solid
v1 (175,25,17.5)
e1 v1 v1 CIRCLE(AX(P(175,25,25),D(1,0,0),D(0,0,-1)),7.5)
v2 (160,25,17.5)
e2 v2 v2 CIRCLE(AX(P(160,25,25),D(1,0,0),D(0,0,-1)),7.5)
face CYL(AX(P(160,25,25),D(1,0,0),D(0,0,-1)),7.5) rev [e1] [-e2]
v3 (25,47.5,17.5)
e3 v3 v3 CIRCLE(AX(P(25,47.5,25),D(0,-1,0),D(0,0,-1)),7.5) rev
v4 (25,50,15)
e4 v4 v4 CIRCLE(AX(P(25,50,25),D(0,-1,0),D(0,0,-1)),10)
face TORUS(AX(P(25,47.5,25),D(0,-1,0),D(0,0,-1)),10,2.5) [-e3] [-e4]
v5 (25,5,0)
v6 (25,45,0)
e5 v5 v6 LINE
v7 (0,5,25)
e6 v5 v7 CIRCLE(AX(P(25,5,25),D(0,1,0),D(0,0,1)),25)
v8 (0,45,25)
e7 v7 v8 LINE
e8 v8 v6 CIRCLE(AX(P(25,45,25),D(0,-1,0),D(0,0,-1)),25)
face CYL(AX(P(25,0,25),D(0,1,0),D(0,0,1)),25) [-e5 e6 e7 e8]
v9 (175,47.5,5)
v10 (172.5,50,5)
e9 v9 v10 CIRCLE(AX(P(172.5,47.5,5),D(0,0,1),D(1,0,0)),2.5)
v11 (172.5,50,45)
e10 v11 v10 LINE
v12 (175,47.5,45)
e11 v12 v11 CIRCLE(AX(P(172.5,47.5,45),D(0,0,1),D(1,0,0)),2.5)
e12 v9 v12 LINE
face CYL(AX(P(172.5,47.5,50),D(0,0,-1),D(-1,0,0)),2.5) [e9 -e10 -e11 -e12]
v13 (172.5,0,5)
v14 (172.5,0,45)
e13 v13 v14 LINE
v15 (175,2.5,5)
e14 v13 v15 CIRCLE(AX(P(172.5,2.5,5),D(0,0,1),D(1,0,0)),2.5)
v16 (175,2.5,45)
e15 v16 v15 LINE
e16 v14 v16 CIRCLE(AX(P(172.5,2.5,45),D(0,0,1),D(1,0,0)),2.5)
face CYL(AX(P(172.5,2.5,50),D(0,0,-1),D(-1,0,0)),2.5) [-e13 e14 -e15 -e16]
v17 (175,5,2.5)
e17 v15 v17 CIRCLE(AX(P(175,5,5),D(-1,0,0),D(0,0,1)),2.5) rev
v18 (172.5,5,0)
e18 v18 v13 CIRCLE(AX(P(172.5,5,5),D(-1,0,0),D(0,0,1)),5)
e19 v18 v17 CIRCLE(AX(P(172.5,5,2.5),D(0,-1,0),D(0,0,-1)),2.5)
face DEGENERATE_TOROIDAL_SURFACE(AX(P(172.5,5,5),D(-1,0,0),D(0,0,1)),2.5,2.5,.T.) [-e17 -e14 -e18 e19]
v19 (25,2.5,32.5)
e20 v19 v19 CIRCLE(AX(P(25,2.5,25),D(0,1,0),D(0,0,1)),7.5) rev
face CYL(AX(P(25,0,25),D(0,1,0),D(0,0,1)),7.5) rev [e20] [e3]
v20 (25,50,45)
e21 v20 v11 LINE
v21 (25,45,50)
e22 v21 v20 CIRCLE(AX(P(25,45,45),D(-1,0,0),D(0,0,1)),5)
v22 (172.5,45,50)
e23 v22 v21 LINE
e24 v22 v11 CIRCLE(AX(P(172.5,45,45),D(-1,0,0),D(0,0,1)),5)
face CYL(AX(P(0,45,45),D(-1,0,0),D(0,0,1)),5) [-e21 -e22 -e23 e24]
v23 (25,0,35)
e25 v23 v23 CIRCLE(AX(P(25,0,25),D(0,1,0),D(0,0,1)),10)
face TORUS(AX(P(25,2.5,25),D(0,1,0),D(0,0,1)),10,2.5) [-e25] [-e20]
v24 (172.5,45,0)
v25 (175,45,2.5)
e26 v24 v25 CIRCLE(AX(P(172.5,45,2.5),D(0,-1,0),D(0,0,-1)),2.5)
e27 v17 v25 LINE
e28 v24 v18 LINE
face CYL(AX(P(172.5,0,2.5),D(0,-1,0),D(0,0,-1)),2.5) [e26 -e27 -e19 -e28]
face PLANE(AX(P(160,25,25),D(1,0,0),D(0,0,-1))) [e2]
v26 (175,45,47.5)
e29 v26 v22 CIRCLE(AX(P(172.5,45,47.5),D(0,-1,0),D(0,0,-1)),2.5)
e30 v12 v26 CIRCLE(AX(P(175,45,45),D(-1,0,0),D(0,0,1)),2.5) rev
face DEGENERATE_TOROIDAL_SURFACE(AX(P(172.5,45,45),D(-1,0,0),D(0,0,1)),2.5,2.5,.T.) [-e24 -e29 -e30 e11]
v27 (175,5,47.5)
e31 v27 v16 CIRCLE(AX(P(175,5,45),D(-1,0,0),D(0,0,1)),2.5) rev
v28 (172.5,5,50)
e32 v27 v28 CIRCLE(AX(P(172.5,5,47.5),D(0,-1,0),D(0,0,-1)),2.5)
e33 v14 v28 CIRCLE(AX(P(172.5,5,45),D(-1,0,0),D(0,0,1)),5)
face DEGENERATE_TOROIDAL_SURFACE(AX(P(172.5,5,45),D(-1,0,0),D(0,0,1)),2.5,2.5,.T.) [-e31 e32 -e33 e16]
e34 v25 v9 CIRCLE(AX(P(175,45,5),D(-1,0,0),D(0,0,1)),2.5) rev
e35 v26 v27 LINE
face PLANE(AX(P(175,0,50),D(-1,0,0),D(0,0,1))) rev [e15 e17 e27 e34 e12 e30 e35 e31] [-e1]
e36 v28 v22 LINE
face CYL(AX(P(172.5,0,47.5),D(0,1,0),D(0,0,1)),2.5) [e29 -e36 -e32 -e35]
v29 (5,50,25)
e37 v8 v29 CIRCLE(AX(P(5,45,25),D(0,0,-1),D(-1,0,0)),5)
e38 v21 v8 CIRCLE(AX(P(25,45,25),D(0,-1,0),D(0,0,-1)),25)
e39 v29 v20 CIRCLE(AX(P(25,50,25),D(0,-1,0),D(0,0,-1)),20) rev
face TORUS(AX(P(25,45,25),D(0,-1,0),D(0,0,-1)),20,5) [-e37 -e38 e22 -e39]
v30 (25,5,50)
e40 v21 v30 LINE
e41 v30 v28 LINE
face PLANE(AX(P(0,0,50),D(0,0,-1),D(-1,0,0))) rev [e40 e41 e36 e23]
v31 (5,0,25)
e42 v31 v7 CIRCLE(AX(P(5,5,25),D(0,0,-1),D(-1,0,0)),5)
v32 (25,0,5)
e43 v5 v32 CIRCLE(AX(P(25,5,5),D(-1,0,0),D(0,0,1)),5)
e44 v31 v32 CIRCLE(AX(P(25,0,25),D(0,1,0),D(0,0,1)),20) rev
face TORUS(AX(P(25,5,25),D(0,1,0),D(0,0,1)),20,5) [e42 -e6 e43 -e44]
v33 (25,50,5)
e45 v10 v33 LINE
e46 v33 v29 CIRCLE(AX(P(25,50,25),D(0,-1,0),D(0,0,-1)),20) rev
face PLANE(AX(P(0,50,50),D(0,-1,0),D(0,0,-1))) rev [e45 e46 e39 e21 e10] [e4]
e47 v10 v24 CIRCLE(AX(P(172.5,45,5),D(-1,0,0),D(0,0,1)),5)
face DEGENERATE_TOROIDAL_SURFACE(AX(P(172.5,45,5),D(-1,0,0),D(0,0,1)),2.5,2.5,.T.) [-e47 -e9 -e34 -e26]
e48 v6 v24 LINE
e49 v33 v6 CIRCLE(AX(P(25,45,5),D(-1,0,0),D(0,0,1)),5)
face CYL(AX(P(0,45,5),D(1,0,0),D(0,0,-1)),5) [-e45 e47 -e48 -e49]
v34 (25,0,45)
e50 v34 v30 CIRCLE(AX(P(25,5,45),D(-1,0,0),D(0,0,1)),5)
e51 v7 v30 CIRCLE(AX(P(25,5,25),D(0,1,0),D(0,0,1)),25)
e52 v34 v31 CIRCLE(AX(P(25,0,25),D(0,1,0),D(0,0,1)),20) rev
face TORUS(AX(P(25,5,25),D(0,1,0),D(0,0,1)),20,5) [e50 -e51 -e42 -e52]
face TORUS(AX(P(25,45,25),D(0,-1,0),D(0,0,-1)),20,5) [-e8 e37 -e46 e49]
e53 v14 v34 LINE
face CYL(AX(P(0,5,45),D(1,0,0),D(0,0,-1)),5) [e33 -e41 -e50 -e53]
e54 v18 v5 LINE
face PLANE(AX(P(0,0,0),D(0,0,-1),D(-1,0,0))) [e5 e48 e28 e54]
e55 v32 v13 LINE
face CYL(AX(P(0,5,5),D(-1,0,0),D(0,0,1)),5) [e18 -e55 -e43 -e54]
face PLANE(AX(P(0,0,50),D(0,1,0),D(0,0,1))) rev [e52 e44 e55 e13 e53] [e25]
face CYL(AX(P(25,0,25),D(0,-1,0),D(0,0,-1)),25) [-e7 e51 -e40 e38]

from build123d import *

# Parameters (mm, degrees)
CROQUIS1_W              = 175
CROQUIS1_H              = 50
SALIENTE_EXTRUIR1_DEPTH = 50
REDONDEO1_R             = 25
CROQUIS2_R              = 7.5
CORTAR_EXTRUIR1_DEPTH   = 15
CROQUIS3_R              = 7.5
CORTAR_EXTRUIR2_DEPTH   = 189.745860882
REDONDEO2_R             = 5
REDONDEO3_R             = 2.5
REDONDEO4_R             = 2.5


with BuildPart() as part:
    # Croquis1 → Saliente-Extruir1 (new body)
    with BuildSketch(Plane.XY):
        with Locations((87.5, 25)):
            Rectangle(CROQUIS1_W, CROQUIS1_H)
    extrude(amount=SALIENTE_EXTRUIR1_DEPTH)

    # Redondeo1
    redondeo1_edges = [part.edges().sort_by_distance(p)[0] for p in [
        (0, 25, 0),
        (0, 25, 50),
    ]]
    fillet(redondeo1_edges, radius=REDONDEO1_R - 0.0001)  # a hair under: the kernel refuses the full size

    # Croquis2 → Cortar-Extruir1 (cut)
    with BuildSketch(Plane(origin=(175, 0, 0), x_dir=(0, 0, -1), z_dir=(1, 0, 0))):
        with Locations((-25, 25)):
            Circle(CROQUIS2_R)
    extrude(amount=-CORTAR_EXTRUIR1_DEPTH, mode=Mode.SUBTRACT)

    # Croquis3 → Cortar-Extruir2 (cut, through all)
    with BuildSketch(Plane(origin=(0, 50, 0), x_dir=(1, 0, 0), z_dir=(0, 1, 0))):
        with Locations(Location((25, -25, 0), (0, 0, 270))):
            Circle(CROQUIS3_R)
    extrude(amount=-CORTAR_EXTRUIR2_DEPTH, mode=Mode.SUBTRACT)

    # Redondeo2
    redondeo2_edges = [part.edges().sort_by_distance(p)[0] for p in [
        (99.99995, 50, 50),
        (99.99995, 0, 0),
        (99.99995, 0, 50),
        (7.322301181, 0, 42.677698819),
        (7.322301181, 0, 7.322301181),
        (7.322301181, 50, 42.677698819),
        (7.322301181, 50, 7.322301181),
        (99.99995, 50, 0),
    ]]
    fillet(redondeo2_edges, radius=REDONDEO2_R)

    # Redondeo3
    redondeo3_edges = [part.edges().sort_by_distance(p)[0] for p in [
        (25, 0, 17.5),
        (25, 50, 17.5),
    ]]
    fillet(redondeo3_edges, radius=REDONDEO3_R)

    # Redondeo4
    redondeo4_edges = [part.edges().sort_by_distance(p)[0] for p in [
        (175, 0, 25),
        (175, 50, 25),
        (175, 25, 0),
        (175, 25, 50),
        (175, 48.535533906, 48.535533906),
        (175, 48.535533906, 1.464466094),
        (175, 1.464466094, 48.535533906),
        (175, 1.464466094, 1.464466094),
    ]]
    fillet(redondeo4_edges, radius=REDONDEO4_R)


solid = part.part
